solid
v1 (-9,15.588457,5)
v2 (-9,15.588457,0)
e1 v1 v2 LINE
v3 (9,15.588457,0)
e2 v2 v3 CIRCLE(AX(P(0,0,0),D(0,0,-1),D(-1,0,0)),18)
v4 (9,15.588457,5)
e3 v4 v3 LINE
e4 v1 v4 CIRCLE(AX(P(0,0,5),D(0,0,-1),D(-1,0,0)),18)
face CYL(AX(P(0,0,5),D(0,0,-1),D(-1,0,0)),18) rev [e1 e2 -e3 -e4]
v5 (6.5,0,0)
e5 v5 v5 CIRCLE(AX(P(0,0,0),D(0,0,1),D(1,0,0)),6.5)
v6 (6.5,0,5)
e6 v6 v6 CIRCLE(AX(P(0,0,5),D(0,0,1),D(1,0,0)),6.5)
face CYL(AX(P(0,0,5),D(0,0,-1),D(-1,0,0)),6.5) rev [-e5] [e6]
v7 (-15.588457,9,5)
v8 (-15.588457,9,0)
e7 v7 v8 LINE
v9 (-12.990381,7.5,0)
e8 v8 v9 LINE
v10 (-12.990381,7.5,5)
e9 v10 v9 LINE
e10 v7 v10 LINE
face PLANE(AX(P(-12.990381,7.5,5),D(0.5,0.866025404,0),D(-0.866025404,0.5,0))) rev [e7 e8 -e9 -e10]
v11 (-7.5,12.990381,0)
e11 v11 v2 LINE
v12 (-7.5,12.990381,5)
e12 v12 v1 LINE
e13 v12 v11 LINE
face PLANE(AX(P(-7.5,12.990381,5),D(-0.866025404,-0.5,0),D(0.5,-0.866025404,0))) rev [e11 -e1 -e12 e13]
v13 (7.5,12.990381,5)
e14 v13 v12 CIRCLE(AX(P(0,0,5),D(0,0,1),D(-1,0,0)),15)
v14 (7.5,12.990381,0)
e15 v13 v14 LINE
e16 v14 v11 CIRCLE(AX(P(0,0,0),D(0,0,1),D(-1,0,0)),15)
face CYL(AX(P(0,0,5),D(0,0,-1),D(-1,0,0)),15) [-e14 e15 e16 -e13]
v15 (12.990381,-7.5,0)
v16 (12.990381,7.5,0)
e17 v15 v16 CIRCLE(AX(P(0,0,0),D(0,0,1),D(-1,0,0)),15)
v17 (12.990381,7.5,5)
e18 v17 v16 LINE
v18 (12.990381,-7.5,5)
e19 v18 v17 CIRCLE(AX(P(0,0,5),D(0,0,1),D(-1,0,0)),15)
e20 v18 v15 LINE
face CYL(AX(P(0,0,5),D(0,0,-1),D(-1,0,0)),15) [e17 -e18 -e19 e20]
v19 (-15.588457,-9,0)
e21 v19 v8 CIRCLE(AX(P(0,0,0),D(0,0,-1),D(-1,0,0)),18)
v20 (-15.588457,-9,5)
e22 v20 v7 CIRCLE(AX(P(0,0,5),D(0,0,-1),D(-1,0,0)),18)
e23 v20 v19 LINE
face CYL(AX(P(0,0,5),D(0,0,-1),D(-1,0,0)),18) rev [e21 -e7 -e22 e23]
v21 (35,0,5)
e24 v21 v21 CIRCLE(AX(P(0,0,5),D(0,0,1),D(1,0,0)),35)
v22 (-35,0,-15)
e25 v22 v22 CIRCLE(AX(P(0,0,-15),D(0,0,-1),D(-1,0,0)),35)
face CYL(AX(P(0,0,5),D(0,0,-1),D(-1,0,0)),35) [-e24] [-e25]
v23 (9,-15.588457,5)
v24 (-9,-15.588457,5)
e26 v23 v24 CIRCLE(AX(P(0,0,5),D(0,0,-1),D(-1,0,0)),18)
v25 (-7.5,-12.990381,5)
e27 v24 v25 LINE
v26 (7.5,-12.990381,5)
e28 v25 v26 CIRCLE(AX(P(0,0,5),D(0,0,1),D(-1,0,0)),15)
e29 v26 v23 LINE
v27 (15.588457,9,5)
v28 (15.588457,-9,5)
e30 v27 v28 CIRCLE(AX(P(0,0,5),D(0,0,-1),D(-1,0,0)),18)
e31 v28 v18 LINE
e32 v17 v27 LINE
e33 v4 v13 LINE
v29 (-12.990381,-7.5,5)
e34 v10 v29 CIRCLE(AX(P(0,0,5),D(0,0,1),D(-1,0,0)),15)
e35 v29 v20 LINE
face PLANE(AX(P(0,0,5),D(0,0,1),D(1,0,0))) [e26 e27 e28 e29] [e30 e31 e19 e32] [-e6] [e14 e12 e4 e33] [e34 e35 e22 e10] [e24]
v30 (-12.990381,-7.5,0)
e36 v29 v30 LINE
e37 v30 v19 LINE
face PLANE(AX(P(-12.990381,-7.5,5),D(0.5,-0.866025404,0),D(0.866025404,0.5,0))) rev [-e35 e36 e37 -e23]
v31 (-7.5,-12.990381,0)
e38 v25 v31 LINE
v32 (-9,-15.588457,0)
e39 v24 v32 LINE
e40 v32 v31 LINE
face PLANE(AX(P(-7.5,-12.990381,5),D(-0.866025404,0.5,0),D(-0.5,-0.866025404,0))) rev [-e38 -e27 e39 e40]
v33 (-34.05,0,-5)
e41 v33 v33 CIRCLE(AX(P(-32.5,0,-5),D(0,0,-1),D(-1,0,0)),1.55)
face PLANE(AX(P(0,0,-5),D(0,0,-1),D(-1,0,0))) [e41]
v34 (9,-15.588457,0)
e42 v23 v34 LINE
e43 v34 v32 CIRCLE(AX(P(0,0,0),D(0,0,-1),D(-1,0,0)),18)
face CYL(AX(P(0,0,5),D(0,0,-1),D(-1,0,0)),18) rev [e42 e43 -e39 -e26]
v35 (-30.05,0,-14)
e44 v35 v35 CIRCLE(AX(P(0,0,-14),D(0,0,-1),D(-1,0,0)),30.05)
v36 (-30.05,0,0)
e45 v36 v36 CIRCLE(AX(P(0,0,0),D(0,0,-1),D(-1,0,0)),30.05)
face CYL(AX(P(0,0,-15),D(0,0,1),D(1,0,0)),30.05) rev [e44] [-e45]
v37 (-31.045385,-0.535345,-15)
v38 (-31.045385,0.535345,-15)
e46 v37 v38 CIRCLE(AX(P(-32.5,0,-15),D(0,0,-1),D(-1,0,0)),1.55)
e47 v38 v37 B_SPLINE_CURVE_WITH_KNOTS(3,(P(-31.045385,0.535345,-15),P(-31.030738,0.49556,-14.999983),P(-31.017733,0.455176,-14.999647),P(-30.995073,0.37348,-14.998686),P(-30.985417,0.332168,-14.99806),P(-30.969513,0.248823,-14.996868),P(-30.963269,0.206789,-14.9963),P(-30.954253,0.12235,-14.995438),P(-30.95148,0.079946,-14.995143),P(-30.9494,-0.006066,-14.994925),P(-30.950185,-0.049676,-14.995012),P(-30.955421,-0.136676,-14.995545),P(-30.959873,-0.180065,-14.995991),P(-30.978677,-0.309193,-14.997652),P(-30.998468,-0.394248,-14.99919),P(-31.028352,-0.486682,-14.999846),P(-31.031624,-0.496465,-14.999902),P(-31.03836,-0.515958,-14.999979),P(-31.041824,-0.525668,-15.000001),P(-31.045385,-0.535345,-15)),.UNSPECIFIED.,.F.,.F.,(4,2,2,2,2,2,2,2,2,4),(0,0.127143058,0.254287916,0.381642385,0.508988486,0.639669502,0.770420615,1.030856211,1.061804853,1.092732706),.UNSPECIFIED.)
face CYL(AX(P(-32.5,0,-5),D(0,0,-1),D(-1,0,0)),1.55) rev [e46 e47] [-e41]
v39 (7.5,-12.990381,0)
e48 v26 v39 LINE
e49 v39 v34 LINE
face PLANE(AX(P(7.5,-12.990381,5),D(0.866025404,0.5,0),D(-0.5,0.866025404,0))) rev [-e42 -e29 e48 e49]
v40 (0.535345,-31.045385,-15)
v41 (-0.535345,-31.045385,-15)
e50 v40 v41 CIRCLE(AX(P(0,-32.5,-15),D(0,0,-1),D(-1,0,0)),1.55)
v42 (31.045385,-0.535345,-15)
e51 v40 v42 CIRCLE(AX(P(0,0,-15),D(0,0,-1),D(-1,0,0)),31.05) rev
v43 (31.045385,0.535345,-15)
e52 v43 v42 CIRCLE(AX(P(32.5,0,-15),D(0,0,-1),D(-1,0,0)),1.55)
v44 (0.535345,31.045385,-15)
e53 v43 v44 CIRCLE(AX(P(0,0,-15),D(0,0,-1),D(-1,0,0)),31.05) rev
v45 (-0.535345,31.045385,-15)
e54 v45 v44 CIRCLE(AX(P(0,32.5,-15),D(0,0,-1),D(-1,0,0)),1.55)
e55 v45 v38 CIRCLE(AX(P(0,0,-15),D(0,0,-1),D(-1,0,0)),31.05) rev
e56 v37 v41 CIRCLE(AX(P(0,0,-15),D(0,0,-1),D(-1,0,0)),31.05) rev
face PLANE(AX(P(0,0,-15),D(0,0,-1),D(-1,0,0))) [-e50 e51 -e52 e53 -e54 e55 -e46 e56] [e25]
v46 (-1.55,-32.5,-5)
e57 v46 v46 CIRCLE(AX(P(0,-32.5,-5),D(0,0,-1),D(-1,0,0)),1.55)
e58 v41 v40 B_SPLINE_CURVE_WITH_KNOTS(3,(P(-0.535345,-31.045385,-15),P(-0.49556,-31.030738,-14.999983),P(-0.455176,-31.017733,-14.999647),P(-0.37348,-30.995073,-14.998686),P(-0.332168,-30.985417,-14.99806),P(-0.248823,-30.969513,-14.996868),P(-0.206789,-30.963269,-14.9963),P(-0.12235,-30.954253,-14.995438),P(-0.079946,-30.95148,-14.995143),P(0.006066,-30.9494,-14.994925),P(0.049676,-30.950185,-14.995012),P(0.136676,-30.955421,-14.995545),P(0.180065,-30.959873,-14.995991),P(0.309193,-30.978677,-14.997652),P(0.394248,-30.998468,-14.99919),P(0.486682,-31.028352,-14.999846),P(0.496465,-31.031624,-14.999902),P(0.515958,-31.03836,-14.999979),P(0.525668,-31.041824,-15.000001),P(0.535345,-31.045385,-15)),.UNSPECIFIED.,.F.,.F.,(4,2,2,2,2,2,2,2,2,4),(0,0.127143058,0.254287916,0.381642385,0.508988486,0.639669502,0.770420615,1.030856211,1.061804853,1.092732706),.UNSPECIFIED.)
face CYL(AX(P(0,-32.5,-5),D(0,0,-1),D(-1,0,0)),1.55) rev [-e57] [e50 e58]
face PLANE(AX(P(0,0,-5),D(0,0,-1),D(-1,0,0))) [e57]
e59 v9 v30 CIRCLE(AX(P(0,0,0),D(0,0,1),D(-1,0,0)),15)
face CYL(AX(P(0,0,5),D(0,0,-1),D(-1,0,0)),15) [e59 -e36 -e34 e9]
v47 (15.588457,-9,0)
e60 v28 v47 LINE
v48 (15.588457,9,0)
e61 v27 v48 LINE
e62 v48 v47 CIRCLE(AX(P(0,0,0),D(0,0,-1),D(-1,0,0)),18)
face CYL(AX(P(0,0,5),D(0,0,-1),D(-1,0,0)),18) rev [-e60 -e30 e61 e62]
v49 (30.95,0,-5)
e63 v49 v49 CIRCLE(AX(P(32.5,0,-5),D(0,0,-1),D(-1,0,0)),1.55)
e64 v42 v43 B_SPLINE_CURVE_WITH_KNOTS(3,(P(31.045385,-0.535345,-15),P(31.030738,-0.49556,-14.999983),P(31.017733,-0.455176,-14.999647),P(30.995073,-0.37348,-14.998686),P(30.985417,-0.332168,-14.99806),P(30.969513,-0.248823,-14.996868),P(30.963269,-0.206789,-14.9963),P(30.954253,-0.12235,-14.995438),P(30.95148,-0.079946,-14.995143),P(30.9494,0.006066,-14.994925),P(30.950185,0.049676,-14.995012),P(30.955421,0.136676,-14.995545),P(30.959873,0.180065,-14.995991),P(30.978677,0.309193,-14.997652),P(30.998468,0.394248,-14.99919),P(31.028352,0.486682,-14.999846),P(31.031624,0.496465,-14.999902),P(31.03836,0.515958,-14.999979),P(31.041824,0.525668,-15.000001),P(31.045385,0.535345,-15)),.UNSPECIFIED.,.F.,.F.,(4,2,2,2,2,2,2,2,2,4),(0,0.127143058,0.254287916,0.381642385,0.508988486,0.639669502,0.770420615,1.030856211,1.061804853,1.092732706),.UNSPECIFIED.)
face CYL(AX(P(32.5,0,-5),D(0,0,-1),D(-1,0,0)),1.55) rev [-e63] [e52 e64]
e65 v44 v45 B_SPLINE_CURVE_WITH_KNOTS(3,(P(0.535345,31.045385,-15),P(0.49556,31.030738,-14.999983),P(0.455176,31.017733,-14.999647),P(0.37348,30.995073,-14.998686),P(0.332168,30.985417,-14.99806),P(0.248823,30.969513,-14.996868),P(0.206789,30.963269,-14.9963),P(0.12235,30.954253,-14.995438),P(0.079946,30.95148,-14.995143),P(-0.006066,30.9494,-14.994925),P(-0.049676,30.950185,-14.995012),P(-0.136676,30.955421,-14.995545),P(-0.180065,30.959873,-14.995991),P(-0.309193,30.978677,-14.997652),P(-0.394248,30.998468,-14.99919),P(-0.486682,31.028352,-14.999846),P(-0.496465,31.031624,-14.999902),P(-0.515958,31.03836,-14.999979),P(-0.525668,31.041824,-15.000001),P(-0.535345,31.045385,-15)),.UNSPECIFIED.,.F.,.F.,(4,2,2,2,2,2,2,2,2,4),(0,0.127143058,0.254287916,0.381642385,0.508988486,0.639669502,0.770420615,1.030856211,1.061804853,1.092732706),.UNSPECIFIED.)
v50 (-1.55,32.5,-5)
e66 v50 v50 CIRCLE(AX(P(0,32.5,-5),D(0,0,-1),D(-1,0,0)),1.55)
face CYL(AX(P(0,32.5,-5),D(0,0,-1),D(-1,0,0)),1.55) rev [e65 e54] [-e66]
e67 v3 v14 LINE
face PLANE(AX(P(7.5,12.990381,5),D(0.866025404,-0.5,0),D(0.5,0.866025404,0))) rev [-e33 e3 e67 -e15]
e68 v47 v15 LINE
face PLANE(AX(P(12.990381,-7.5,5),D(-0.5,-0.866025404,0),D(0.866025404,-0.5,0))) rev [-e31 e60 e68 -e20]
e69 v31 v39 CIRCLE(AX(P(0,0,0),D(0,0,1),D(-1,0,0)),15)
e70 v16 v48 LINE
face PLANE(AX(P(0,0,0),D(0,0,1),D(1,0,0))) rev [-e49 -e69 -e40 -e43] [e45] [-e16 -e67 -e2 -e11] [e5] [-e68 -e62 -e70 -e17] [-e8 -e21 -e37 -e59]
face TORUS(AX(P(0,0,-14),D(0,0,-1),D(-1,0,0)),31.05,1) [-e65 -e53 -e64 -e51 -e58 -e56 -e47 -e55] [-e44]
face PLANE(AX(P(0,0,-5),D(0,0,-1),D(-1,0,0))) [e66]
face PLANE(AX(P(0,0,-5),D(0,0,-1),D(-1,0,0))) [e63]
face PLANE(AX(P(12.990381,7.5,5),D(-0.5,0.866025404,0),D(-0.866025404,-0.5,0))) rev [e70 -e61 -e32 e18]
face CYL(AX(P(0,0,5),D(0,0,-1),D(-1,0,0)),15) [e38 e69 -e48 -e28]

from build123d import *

# Parameters (mm, degrees)
SKETCH_2_R          = 35
SKETCH_2_R_2        = 6.5
EXTRUDE_1_DEPTH     = 5
EXTRUDE_START       = 15
SKETCH_3_R          = 35
SKETCH_3_R_2        = 30.05
EXTRUDE_2_DEPTH     = 15
SKETCH_4_R          = 1.55
CUT_EXTRUDE_1_DEPTH = 10
FILLET_1_R          = 1
CUT_EXTRUDE_2_DEPTH = 52.720402193


with BuildPart() as part:
    # 草图2 → 凸台-拉伸1 (new body)
    with BuildSketch(Plane.XY):
        Circle(SKETCH_2_R)
        Circle(SKETCH_2_R_2, mode=Mode.SUBTRACT)
    extrude(amount=EXTRUDE_1_DEPTH)

    # 草图3 → 凸台-拉伸2 (add)
    with BuildSketch(Plane(origin=(0, 0, 0), x_dir=(-1, 0, 0), z_dir=(0, 0, -1)).offset(EXTRUDE_START)):
        Circle(SKETCH_3_R)
        Circle(SKETCH_3_R_2, mode=Mode.SUBTRACT)
    extrude(amount=-EXTRUDE_2_DEPTH)

    # 草图4 → 切除-拉伸1 (cut)
    with BuildSketch(Plane(origin=(0, 0, -15), x_dir=(-1, 0, 0), z_dir=(0, 0, -1))):
        with Locations((0, 32.5)):
            Circle(SKETCH_4_R)
        with Locations((32.5, 0)):
            Circle(SKETCH_4_R)
        with Locations((0, -32.5)):
            Circle(SKETCH_4_R)
        with Locations((-32.5, 0)):
            Circle(SKETCH_4_R)
    extrude(amount=-CUT_EXTRUDE_1_DEPTH, mode=Mode.SUBTRACT)

    # 圆角1
    # the kernel refuses this fillet: 1 mm, written as the material it takes off along each edge
    with BuildSketch(Plane(origin=(0, 0, -15), x_dir=(-1, 0, 0), z_dir=(0, -1, 0))) as fillet_1_piece_1:
        with BuildLine():
            CenterArc((30.05 + FILLET_1_R, -FILLET_1_R), FILLET_1_R, 90, 90)
            Line((30.05, -FILLET_1_R), (30.05, 0))
            Line((30.05, 0), (30.05 + FILLET_1_R, 0))
        make_face()
    revolve(axis=Axis((0, 0, -15), (0, 0, -1)), mode=Mode.SUBTRACT)

    # 草图5 → 切除-拉伸2 (cut, through all)
    with BuildSketch(Plane(origin=(0, 0, 0), x_dir=(-1, 0, 0), z_dir=(0, 0, -1))):
        with BuildLine():
            Line((12.990381057, -7.5), (15.588457268, -9))
            ThreePointArc((15.588457268, -9), (18, 0), (15.588457268, 9))
            Line((15.588457268, 9), (12.990381057, 7.5))
            ThreePointArc((12.990381057, 7.5), (15, 0), (12.990381057, -7.5))
        make_face()
        with BuildLine():
            Line((-7.5, 12.990381057), (-9, 15.588457268))
            ThreePointArc((-9, 15.588457268), (0, 18), (9, 15.588457268))
            Line((9, 15.588457268), (7.5, 12.990381057))
            ThreePointArc((7.5, 12.990381057), (0, 15), (-7.5, 12.990381057))
        make_face()
        with BuildLine():
            Line((-7.5, -12.990381057), (-9, -15.588457268))
            ThreePointArc((-9, -15.588457268), (0, -18), (9, -15.588457268))
            Line((9, -15.588457268), (7.5, -12.990381057))
            ThreePointArc((7.5, -12.990381057), (0, -15), (-7.5, -12.990381057))
        make_face()
        with BuildLine():
            Line((-12.990381057, 7.5), (-15.588457268, 9))
            ThreePointArc((-15.588457268, 9), (-18, 0), (-15.588457268, -9))
            Line((-15.588457268, -9), (-12.990381057, -7.5))
            ThreePointArc((-12.990381057, -7.5), (-15, 0), (-12.990381057, 7.5))
        make_face()
    extrude(amount=-CUT_EXTRUDE_2_DEPTH, mode=Mode.SUBTRACT)


solid = part.part
